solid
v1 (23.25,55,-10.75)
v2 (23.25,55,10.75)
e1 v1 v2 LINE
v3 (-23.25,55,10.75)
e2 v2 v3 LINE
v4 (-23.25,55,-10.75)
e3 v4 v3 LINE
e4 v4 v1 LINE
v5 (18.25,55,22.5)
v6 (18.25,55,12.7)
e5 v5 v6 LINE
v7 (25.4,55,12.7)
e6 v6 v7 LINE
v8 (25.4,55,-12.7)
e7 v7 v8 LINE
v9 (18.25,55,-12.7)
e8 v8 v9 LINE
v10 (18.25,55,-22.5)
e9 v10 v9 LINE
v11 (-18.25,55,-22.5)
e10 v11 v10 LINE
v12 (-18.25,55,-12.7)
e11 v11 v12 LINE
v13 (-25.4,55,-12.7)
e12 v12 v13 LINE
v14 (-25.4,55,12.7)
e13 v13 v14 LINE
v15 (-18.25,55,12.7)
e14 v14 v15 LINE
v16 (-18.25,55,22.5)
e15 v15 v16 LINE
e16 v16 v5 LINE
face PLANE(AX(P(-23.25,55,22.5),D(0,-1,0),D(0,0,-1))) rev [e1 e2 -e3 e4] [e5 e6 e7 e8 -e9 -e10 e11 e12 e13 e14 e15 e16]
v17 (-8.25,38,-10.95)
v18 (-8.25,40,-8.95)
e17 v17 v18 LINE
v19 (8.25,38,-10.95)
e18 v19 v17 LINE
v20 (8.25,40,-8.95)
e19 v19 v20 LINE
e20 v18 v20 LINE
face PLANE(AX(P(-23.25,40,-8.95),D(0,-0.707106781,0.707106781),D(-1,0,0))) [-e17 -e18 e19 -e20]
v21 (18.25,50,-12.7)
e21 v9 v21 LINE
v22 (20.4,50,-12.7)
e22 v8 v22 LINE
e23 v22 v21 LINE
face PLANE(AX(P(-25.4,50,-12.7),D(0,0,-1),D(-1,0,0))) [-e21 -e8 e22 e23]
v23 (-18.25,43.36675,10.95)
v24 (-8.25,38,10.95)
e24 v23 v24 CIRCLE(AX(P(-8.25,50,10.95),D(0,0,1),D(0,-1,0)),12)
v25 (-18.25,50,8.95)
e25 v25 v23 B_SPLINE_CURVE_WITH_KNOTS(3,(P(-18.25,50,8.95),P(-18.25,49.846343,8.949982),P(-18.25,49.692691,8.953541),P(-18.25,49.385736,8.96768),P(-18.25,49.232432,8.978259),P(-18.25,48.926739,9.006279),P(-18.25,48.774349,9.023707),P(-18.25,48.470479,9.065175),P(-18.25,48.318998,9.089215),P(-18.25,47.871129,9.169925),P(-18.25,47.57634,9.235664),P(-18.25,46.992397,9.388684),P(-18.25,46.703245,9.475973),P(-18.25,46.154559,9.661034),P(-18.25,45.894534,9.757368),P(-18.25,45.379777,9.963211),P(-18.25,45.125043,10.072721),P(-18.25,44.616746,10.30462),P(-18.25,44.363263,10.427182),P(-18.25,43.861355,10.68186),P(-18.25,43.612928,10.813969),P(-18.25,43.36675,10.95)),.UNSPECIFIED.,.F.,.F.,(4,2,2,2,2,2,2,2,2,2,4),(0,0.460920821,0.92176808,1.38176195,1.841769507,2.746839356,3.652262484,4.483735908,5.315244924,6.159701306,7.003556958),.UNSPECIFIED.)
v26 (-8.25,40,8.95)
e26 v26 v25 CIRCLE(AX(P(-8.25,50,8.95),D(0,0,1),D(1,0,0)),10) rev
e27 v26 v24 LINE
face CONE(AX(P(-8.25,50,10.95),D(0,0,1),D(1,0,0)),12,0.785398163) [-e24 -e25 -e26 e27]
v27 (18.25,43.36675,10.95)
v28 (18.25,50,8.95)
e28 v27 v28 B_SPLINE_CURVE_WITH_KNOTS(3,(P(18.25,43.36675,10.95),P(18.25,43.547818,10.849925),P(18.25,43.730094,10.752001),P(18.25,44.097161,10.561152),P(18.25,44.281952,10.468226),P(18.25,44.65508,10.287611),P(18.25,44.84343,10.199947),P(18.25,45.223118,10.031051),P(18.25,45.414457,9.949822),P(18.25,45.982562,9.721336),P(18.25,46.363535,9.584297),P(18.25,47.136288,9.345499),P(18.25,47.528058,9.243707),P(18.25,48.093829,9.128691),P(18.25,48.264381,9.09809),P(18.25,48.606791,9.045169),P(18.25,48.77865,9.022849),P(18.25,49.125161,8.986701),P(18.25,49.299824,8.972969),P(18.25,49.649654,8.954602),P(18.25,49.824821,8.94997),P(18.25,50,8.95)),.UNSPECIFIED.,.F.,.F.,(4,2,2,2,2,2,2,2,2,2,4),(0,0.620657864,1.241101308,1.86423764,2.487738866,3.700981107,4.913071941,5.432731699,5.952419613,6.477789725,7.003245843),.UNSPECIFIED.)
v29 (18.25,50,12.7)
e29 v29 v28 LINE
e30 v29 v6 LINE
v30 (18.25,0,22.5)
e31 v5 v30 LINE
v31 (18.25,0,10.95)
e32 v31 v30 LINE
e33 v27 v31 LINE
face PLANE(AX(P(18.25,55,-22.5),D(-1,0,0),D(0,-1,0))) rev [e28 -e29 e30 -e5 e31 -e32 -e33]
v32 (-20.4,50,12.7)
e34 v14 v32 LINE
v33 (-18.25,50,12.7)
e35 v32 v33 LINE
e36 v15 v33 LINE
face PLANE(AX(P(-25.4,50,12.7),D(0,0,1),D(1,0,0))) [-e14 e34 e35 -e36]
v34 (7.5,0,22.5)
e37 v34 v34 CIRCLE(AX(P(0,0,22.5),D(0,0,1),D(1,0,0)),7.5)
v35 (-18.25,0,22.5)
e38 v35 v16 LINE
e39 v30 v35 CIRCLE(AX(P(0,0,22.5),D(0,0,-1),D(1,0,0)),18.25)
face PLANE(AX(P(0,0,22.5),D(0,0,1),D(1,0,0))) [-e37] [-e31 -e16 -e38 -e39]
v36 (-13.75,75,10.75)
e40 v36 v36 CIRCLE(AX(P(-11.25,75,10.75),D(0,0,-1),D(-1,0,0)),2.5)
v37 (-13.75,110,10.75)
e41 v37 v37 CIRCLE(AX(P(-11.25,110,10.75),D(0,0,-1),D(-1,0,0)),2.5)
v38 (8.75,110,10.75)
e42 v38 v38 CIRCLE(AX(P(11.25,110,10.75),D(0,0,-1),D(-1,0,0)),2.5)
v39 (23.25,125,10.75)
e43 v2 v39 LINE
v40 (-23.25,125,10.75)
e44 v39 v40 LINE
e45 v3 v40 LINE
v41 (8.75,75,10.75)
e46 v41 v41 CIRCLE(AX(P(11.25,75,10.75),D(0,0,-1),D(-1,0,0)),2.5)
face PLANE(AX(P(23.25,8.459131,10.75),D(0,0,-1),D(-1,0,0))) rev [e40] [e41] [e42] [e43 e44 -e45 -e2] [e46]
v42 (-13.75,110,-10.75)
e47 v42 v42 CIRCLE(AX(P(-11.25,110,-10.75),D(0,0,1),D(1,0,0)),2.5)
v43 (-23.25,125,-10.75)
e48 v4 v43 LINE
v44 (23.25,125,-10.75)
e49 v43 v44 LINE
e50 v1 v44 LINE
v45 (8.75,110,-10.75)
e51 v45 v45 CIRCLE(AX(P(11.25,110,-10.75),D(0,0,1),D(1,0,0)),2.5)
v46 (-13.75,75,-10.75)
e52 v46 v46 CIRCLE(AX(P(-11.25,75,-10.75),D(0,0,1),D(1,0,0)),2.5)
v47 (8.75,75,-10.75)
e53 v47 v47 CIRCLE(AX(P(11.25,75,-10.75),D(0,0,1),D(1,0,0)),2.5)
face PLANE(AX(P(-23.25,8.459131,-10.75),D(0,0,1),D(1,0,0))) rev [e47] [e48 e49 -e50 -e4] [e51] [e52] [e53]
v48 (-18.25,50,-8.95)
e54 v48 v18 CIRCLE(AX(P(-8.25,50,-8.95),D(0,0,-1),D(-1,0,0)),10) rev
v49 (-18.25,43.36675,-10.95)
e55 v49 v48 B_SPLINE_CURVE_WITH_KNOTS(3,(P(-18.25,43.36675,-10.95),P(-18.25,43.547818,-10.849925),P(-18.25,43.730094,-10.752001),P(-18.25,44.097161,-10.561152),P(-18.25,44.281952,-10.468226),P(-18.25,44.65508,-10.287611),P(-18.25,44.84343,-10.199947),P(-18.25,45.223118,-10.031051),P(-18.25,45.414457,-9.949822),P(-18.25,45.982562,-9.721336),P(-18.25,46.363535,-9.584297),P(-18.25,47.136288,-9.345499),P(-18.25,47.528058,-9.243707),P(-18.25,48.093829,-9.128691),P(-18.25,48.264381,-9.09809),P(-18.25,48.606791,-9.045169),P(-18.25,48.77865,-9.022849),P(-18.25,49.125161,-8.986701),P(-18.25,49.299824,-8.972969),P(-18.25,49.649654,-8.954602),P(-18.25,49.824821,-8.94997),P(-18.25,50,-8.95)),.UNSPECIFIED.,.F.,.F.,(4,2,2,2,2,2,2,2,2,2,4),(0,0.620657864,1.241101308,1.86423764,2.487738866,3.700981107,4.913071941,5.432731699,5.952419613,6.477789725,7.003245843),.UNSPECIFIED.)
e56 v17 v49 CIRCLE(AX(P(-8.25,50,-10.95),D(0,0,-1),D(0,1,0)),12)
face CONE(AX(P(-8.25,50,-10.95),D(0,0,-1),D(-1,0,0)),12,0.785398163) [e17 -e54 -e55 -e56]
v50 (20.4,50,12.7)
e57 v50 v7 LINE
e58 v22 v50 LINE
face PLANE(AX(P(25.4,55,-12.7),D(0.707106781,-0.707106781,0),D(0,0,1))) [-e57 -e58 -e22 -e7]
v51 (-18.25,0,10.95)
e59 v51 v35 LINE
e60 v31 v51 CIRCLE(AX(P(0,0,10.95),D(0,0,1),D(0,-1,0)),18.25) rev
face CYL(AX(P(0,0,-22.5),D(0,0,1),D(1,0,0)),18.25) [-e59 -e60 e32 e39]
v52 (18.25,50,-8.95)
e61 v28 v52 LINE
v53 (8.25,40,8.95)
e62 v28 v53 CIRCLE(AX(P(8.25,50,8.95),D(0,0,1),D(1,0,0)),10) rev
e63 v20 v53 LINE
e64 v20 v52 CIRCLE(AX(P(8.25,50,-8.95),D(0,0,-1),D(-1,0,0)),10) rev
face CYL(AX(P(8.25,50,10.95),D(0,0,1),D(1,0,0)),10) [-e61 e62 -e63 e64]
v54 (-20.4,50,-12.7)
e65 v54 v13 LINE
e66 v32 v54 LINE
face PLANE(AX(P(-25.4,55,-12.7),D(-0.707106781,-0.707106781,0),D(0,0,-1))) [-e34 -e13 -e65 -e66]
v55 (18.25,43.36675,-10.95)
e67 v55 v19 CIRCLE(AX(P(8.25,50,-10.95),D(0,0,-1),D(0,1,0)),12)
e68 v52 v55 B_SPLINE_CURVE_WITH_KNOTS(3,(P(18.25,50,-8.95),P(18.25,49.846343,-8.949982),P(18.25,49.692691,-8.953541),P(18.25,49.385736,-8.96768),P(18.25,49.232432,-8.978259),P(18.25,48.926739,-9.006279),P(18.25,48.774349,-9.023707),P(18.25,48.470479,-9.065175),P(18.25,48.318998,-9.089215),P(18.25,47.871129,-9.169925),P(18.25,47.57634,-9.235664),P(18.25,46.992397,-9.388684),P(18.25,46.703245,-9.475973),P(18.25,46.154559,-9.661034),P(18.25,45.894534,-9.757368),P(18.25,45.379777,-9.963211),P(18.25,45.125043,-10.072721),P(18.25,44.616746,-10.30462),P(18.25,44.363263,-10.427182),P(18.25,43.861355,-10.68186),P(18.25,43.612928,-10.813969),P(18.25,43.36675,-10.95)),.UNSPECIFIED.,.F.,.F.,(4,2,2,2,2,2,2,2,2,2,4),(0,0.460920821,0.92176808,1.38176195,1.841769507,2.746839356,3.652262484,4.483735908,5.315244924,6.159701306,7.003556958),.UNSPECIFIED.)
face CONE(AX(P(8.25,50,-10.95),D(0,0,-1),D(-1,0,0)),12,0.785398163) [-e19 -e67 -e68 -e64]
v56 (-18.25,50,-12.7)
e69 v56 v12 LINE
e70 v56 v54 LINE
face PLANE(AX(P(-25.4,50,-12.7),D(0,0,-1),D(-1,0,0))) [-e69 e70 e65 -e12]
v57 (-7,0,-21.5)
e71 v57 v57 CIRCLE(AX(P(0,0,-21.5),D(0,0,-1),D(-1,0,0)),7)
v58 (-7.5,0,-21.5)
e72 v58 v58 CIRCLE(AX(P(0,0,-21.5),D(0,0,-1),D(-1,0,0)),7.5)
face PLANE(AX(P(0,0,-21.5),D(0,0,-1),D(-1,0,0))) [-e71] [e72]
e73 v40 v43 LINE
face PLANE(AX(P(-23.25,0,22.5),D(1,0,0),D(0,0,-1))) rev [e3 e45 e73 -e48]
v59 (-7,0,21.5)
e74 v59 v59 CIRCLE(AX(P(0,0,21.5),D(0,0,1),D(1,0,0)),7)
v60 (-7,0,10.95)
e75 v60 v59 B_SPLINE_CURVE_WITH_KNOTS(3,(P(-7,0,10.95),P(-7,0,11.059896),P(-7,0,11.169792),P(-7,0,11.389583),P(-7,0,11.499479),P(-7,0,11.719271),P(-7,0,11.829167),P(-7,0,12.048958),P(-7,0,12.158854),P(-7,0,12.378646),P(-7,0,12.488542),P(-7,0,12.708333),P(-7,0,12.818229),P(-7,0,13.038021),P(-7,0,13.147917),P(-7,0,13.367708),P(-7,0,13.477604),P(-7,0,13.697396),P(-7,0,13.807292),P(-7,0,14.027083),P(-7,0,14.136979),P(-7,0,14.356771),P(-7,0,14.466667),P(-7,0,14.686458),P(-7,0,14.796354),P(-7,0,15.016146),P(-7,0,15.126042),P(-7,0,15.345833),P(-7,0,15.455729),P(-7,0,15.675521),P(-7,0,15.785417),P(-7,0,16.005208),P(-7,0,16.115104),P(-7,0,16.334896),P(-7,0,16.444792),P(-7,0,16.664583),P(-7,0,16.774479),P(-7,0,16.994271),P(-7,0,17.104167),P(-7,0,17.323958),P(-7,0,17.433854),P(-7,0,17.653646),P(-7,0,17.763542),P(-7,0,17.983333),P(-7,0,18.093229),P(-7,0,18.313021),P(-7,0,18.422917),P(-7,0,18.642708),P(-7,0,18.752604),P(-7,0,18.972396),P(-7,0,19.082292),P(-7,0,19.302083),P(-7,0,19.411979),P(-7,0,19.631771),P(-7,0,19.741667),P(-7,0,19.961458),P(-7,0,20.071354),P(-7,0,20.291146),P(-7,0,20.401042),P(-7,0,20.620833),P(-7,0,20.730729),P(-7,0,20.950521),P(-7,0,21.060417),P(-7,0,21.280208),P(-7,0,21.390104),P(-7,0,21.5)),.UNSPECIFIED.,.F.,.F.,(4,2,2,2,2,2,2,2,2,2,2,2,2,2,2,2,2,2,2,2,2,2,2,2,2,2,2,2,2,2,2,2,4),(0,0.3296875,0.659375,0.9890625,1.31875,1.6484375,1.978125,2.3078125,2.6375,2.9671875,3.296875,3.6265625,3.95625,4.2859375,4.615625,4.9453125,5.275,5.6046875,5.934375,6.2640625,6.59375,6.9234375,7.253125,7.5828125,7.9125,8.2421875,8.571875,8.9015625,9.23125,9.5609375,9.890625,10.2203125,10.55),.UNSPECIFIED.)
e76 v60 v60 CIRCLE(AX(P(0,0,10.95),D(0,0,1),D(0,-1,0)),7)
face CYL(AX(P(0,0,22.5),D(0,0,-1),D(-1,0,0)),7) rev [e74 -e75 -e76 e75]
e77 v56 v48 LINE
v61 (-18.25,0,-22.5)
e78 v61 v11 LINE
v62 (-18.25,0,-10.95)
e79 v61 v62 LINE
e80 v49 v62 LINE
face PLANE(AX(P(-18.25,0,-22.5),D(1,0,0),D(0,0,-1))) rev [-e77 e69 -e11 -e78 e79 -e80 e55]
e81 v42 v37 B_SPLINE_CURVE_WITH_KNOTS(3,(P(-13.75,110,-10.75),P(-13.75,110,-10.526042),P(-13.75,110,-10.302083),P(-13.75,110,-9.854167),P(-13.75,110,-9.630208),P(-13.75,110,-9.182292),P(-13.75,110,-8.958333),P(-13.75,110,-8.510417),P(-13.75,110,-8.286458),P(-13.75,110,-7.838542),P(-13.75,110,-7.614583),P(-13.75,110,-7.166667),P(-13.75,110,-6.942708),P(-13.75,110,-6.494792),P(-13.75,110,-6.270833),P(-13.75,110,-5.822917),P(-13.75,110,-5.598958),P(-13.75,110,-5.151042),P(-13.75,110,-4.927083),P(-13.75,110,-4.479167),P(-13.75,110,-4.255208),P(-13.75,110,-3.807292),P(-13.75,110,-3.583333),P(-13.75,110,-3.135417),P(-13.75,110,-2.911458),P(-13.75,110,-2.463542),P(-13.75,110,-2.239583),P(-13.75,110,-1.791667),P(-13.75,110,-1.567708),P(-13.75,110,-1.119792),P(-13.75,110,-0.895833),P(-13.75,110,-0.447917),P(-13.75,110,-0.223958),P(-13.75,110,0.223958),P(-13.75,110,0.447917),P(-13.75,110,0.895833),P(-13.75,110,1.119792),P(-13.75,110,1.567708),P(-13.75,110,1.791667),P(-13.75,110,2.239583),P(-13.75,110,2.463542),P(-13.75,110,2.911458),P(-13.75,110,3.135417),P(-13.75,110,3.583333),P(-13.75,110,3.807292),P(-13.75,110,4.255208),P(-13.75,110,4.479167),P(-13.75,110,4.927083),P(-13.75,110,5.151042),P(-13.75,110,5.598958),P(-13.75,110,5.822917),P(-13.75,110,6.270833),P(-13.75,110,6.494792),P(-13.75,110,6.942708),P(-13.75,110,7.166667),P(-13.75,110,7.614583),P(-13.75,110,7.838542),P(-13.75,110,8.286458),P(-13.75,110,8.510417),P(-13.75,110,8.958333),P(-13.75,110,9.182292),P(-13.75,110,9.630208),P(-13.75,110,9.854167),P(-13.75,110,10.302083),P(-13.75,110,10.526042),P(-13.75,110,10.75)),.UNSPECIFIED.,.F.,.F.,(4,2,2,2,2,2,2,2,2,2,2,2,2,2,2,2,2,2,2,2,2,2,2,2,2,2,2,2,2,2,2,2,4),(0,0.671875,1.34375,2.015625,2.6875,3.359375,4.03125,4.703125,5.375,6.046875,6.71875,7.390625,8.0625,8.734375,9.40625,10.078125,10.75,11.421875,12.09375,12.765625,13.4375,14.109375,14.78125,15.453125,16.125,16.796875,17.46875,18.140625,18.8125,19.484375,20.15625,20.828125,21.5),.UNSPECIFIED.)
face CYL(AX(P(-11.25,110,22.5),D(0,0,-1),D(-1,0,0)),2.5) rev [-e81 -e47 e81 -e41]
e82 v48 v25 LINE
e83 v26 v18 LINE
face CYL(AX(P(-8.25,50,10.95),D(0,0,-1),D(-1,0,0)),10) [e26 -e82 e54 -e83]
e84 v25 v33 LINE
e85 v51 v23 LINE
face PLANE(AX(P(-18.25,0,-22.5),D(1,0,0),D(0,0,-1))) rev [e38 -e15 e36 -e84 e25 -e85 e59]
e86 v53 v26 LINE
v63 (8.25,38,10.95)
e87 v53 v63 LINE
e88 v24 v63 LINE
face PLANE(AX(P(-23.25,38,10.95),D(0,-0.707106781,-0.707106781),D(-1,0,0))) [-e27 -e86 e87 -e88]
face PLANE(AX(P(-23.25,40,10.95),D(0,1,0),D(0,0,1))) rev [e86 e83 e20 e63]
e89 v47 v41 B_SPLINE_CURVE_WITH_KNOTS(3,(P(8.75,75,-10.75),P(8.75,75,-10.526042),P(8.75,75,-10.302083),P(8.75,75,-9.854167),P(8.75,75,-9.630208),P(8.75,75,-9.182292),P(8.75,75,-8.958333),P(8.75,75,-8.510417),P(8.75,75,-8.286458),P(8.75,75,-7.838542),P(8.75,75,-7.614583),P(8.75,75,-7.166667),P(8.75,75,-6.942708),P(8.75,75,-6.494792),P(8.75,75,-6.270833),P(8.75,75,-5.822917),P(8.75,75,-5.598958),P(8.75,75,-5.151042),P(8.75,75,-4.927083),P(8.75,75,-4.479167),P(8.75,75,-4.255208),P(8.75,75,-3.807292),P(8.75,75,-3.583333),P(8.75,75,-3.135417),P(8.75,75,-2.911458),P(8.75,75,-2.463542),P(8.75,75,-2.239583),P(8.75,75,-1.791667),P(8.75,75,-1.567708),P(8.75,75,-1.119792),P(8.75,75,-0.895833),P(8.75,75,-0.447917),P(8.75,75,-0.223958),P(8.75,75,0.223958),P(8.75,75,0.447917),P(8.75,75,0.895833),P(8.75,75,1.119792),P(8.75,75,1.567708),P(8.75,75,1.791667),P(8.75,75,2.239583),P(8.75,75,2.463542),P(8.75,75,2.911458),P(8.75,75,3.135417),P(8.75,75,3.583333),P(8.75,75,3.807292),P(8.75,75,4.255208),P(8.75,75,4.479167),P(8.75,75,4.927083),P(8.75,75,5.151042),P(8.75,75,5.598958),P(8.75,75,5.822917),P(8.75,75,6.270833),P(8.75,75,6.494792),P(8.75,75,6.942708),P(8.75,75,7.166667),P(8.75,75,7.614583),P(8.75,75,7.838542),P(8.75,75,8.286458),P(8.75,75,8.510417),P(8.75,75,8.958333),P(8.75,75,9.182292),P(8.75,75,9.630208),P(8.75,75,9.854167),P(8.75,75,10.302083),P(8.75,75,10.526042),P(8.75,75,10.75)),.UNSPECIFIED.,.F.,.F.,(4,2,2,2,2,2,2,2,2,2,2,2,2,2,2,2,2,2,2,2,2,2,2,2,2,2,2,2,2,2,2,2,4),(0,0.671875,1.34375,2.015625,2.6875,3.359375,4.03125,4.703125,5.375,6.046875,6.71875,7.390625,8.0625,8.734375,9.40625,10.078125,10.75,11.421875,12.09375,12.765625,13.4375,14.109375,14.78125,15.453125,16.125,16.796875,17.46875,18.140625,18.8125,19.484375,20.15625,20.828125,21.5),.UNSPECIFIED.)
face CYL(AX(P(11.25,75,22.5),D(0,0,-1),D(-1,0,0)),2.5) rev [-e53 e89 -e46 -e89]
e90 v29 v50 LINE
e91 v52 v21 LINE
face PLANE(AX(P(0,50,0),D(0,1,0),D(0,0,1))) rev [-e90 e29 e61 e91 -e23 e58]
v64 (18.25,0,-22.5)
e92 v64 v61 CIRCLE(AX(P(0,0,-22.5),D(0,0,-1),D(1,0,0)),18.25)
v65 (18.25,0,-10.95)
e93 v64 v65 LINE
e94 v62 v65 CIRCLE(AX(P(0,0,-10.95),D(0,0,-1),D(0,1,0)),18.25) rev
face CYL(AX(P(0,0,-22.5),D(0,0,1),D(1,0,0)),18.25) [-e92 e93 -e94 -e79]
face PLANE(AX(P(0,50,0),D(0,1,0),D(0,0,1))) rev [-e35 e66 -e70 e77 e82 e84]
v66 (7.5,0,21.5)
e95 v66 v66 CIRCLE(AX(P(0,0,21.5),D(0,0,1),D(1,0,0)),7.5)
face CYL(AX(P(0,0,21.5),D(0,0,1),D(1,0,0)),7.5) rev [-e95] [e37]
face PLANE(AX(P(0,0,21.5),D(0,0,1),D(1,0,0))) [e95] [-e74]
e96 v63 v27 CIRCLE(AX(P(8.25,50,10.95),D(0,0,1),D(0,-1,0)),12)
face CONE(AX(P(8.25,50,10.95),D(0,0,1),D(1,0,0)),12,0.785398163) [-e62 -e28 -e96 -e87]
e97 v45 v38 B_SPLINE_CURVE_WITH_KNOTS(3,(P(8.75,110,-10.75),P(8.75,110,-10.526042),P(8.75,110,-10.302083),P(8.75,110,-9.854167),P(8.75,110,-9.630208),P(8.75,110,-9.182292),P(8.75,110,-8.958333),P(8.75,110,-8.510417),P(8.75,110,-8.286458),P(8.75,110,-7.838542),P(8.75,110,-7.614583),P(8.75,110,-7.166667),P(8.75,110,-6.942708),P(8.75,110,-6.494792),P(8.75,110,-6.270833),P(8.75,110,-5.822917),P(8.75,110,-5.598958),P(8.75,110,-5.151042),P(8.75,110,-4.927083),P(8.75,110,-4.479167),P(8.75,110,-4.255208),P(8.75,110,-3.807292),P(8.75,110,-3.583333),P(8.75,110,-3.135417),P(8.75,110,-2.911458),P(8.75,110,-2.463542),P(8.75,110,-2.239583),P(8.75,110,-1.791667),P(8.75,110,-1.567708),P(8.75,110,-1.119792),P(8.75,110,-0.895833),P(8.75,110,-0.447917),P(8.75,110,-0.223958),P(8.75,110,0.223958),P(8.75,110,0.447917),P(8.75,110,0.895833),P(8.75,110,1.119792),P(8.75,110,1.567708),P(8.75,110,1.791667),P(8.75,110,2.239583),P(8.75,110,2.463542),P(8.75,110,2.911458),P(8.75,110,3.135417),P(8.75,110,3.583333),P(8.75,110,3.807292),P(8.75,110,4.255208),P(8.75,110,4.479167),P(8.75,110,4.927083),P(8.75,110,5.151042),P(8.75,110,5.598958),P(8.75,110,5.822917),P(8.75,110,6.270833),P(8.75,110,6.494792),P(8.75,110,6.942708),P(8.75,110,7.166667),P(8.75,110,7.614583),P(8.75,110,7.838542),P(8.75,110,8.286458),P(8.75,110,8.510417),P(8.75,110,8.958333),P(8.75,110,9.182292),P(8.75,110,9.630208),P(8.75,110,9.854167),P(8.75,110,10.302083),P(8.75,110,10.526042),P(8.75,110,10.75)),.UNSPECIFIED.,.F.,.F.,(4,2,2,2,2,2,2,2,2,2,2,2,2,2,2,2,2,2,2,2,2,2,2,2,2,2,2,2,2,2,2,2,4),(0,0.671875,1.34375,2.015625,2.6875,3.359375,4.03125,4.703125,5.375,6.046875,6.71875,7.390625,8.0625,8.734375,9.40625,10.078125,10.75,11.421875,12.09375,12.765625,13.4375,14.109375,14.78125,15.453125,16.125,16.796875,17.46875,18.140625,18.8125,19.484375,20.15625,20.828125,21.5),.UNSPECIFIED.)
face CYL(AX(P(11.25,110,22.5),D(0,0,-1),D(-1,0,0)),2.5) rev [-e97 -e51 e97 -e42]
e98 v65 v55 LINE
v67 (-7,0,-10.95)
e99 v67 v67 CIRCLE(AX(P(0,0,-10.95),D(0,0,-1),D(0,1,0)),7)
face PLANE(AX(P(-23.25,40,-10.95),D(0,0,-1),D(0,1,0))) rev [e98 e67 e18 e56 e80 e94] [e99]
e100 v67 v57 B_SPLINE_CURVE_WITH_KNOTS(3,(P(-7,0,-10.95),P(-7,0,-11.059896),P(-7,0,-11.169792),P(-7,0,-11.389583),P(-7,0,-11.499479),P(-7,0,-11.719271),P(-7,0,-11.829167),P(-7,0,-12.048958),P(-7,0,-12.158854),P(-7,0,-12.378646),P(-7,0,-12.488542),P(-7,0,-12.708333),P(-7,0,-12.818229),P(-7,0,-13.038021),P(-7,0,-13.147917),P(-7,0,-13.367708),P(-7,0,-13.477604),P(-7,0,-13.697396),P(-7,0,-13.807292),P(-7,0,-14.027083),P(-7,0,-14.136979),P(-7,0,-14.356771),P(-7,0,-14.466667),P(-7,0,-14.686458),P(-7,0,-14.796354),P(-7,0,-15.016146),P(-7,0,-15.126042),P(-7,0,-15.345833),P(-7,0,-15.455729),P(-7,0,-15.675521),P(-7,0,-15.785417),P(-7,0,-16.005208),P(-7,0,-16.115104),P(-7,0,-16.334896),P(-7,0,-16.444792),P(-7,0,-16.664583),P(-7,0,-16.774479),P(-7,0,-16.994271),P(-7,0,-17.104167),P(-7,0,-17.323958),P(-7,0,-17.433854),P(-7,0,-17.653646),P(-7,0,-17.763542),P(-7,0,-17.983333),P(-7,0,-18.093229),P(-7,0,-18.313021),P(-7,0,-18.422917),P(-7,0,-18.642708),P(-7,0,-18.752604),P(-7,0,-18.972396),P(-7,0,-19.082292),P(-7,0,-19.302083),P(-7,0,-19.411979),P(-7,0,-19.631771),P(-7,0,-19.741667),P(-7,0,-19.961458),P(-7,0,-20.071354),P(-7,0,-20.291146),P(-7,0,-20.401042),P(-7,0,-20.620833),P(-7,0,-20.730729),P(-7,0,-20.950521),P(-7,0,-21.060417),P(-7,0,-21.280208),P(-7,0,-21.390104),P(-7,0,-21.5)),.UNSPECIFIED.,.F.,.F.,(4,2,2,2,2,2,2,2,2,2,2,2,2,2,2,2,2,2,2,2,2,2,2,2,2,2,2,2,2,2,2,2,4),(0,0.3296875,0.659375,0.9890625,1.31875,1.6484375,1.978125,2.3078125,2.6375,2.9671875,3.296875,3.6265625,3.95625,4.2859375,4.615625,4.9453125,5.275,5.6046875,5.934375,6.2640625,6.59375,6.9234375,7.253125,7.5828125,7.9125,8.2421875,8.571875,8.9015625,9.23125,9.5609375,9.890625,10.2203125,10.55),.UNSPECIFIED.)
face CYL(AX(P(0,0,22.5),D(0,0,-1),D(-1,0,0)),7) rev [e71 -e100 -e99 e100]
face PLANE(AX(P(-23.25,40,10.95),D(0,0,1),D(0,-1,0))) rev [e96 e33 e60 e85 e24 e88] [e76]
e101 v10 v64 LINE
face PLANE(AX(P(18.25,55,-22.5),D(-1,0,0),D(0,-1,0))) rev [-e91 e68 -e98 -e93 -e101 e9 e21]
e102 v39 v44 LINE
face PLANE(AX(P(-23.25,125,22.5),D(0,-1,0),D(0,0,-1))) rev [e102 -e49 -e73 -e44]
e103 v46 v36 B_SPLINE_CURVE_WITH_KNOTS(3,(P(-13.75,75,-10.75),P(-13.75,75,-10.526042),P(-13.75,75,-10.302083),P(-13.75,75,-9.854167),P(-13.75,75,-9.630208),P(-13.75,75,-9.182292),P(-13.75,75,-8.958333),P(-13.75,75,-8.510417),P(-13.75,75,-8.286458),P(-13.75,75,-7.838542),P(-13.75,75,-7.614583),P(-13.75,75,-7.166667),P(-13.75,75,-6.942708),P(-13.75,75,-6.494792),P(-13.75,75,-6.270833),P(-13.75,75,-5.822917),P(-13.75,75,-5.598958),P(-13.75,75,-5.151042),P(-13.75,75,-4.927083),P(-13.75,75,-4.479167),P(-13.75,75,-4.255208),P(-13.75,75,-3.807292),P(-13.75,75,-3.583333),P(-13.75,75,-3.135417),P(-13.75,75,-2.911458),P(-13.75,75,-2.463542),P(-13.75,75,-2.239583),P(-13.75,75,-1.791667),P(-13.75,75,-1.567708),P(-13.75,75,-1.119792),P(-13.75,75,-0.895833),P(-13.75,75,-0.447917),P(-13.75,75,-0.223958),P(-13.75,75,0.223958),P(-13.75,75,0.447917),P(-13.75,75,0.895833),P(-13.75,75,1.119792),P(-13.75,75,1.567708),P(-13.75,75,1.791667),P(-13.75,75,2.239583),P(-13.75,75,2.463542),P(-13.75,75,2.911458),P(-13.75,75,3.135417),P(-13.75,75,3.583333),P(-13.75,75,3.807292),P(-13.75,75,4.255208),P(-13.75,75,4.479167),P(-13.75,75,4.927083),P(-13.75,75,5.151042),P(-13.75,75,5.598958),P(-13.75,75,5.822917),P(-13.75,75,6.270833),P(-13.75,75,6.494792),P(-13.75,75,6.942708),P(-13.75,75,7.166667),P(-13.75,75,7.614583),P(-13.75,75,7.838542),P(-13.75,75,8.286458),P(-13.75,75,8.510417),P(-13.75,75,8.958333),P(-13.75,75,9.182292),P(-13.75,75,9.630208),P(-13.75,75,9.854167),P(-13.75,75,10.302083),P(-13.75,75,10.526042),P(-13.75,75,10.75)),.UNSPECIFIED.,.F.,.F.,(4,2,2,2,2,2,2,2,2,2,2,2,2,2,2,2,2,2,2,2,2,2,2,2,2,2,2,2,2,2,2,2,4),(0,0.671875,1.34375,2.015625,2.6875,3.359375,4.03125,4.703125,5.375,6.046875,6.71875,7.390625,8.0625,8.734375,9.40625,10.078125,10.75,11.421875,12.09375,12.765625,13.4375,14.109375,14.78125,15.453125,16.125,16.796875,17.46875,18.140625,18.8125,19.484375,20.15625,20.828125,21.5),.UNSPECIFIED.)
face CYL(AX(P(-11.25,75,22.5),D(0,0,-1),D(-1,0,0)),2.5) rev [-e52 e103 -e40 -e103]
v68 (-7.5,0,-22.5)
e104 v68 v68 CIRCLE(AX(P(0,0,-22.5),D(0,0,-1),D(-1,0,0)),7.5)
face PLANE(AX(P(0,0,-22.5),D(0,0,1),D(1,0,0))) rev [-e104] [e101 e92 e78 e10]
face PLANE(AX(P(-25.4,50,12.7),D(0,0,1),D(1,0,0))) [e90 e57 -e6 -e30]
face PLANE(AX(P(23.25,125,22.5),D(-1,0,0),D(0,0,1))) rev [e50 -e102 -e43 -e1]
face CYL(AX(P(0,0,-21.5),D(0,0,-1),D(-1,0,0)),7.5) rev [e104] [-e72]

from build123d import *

# Parameters (mm, degrees)
SKETCH1_R           = 7
SKETCH1_R_2         = 2.5
BOSS_EXTRUDE1_DEPTH = 22.5
SKETCH2_W           = 21.9
SKETCH2_H           = 63.25
CUT_EXTRUDE1_DEPTH  = 136.25346576
SKETCH3_R           = 7.5
CUT_EXTRUDE2_DEPTH  = 1
CUT_EXTRUDE3_START  = -1
SKETCH4_R           = 7.5
CUT_EXTRUDE3_DEPTH  = 1
SKETCH5_W           = 9.8
SKETCH5_H           = 70
CUT_EXTRUDE4_DEPTH  = 136.25346576
CUT_EXTRUDE5_DEPTH  = 135.872393395
CUT_EXTRUDE6_REACH  = 148.858
SKETCH8_W           = 46.5
SKETCH8_H           = 1.95
SKETCH9_W           = 50.8
SKETCH9_H           = 25.4
BOSS_EXTRUDE2_DEPTH = 5
FILLET1_R           = 10
CHAMFER1_SIZE       = 5
CHAMFER2_SIZE       = 2


# Some blends are built 0.0001 mm under size
with BuildPart() as part:
    # Sketch1 → Boss-Extrude1 (new, symmetric)
    with BuildSketch(Plane.XY):
        with BuildLine():
            Line((-23.25, 0), (-23.25, 125))
            Line((-23.25, 125), (23.25, 125))
            Line((23.25, 125), (23.25, 0))
            ThreePointArc((23.25, 0), (0, -23.25), (-23.25, 0))
        make_face()
        with Locations(Location((0, 0, 0), (0, 0, 180))):
            Circle(SKETCH1_R, mode=Mode.SUBTRACT)
        with Locations(Location((-11.25, 110, 0), (0, 0, 180))):
            Circle(SKETCH1_R_2, mode=Mode.SUBTRACT)
        with Locations(Location((11.25, 110, 0), (0, 0, 180))):
            Circle(SKETCH1_R_2, mode=Mode.SUBTRACT)
        with Locations(Location((11.25, 75, 0), (0, 0, 180))):
            Circle(SKETCH1_R_2, mode=Mode.SUBTRACT)
        with Locations(Location((-11.25, 75, 0), (0, 0, 180))):
            Circle(SKETCH1_R_2, mode=Mode.SUBTRACT)
    extrude(amount=BOSS_EXTRUDE1_DEPTH, both=True)

    # Sketch2 → Cut-Extrude1 (cut, through all)
    with BuildSketch(Plane(origin=(23.25, 0, 0), x_dir=(0, 0, -1), z_dir=(1, 0, 0))):
        with Locations((0, 8.375)):
            Rectangle(SKETCH2_W, SKETCH2_H)
    extrude(amount=-CUT_EXTRUDE1_DEPTH, mode=Mode.SUBTRACT)

    # Sketch3 → Cut-Extrude2 (cut)
    with BuildSketch(Plane.XY.offset(22.5)):
        Circle(SKETCH3_R)
    extrude(amount=-CUT_EXTRUDE2_DEPTH, mode=Mode.SUBTRACT)

    # Sketch4 → Cut-Extrude3 (cut)
    with BuildSketch(Plane(origin=(0, 0, -22.5), x_dir=(-1, 0, 0), z_dir=(0, 0, -1)).offset(CUT_EXTRUDE3_START)):
        with Locations(Location((0, 0, 0), (0, 0, 180))):
            Circle(SKETCH4_R)
    extrude(amount=CUT_EXTRUDE3_DEPTH, mode=Mode.SUBTRACT)

    # Sketch5 → Cut-Extrude4 (cut, through all)
    with BuildSketch(Plane(origin=(23.25, 0, 0), x_dir=(0, 0, -1), z_dir=(1, 0, 0))):
        with Locations((-17.6, 90)):
            Rectangle(SKETCH5_W, SKETCH5_H)
        with Locations((17.6, 90)):
            Rectangle(SKETCH5_W, SKETCH5_H)
    extrude(amount=-CUT_EXTRUDE4_DEPTH, mode=Mode.SUBTRACT)

    # Sketch6 → Cut-Extrude5 (cut, through all)
    with BuildSketch(Plane.XY.offset(22.5)):
        with BuildLine():
            Line((-18.25, 0), (-18.25, 55))
            Line((-18.25, 55), (-23.25, 55))
            Line((-23.25, 55), (-23.25, -23.25))
            Line((-23.25, -23.25), (23.25, -23.25))
            Line((23.25, -23.25), (23.25, 55))
            Line((23.25, 55), (18.25, 55))
            Line((18.25, 55), (18.25, 0))
            ThreePointArc((18.25, 0), (0, -18.25), (-18.25, 0))
        make_face()
    extrude(amount=-CUT_EXTRUDE5_DEPTH, mode=Mode.SUBTRACT)

    # Cut-Extrude6: up to this face of the body (flat: up to its plane)
    cut_extrude6_end = Plane(part.part.faces().sort_by_distance((0, 55, -17.6))[0])
    # Sketch8 → Cut-Extrude6 (cut, up to the picked face)
    with BuildSketch(Plane(origin=(0, 125, 0), x_dir=(1, 0, 0), z_dir=(0, 1, 0)), mode=Mode.PRIVATE) as cut_extrude6_sk1:
        with Locations((0, 11.725)):
            Rectangle(SKETCH8_W, SKETCH8_H)
    cut_extrude6_tool1 = split(extrude(cut_extrude6_sk1.sketch, amount=-CUT_EXTRUDE6_REACH, mode=Mode.PRIVATE), bisect_by=cut_extrude6_end, keep=Keep.BOTH, mode=Mode.PRIVATE)
    # Sketch8 → Cut-Extrude6 (cut, up to the picked face)
    with BuildSketch(Plane(origin=(0, 125, 0), x_dir=(1, 0, 0), z_dir=(0, 1, 0)), mode=Mode.PRIVATE) as cut_extrude6_sk2:
        with Locations((0, -11.725)):
            Rectangle(SKETCH8_W, SKETCH8_H)
    cut_extrude6_tool2 = split(extrude(cut_extrude6_sk2.sketch, amount=-CUT_EXTRUDE6_REACH, mode=Mode.PRIVATE), bisect_by=cut_extrude6_end, keep=Keep.BOTH, mode=Mode.PRIVATE)
    add(cut_extrude6_tool1.solids().sort_by(Axis((0, 125, -11.725), (0, -1, 0)))[0], mode=Mode.SUBTRACT)
    add(cut_extrude6_tool2.solids().sort_by(Axis((0, 125, 11.725), (0, -1, 0)))[0], mode=Mode.SUBTRACT)

    # Sketch9 → Boss-Extrude2 (add)
    with BuildSketch(Plane(origin=(0, 55, 0), x_dir=(1, 0, 0), z_dir=(0, 1, 0))):
        Rectangle(SKETCH9_W, SKETCH9_H)
    extrude(amount=-BOSS_EXTRUDE2_DEPTH)

    # Fillet1
    fillet1_edges = [part.edges().sort_by_distance(p)[0] for p in [
        (18.25, 40, 0),
        (-18.25, 40, 0),
    ]]
    fillet(fillet1_edges, radius=FILLET1_R - 0.0001)  # a hair under: the kernel refuses the full size

    # Chamfer1
    chamfer1_edges = [part.edges().sort_by_distance(p)[0] for p in [
        (-25.4, 50, 0),
        (25.4, 50, 0),
    ]]
    chamfer(chamfer1_edges, length=CHAMFER1_SIZE - 0.0001)  # a hair under: the kernel refuses the full size

    # Chamfer2
    # the kernel refuses this chamfer: 2 mm, written as the material it adds along each edge
    with BuildSketch(Plane(origin=(8.2501, 40, -10.95), x_dir=(0, -0.9996219169112968, -0.02749587661058651), z_dir=(-1, 0, 0))) as chamfer2_piece_1:
        Polygon((CHAMFER2_SIZE * 0.999621916911, CHAMFER2_SIZE * 0.0274958766106), (-CHAMFER2_SIZE * 0.0274958766106, CHAMFER2_SIZE * 0.999621916911), (0, 0), align=None)
    extrude(amount=16.5002)
    with BuildSketch(Plane(origin=(8.2501, 40, 10.95), x_dir=(0, -0.9996219169112968, 0.02749587661058651), z_dir=(-1, 0, 0))) as chamfer2_piece_2:
        Polygon((CHAMFER2_SIZE * 0.999621916911, -CHAMFER2_SIZE * 0.0274958766106), (-CHAMFER2_SIZE * 0.0274958766106, -CHAMFER2_SIZE * 0.999621916911), (0, 0), align=None)
    extrude(amount=16.5002)
    with BuildSketch(Plane(origin=(8.2501, 49.9999, 10.95), x_dir=(0, -1, 0), z_dir=(-1, 0, 0))) as chamfer2_piece_3_section:
        Polygon((9.9999 + CHAMFER2_SIZE, 0), (9.9999, -CHAMFER2_SIZE), (9.9999, 0), align=None)
    chamfer2_piece_3 = revolve(axis=Axis((8.2501, 49.9999, 10.95), (0, 0, 1)), revolution_arc=119.48144917, mode=Mode.PRIVATE)
    chamfer2_piece_3 = split(chamfer2_piece_3, bisect_by=Plane(origin=(18.25, 39.233435125, 10.852733076), z_dir=(-1, 0, 0)), keep=Keep.TOP, mode=Mode.PRIVATE)
    chamfer2_piece_3 = split(chamfer2_piece_3, bisect_by=Plane(origin=(10.698789492, 50, 10.852733076), z_dir=(0, -1, 0)), keep=Keep.TOP, mode=Mode.PRIVATE)
    add(chamfer2_piece_3)
    with BuildSketch(Plane(origin=(8.2501, 49.9999, -10.95), x_dir=(0, -1, 0), z_dir=(-1, 0, 0))) as chamfer2_piece_4_section:
        Polygon((9.9999 + CHAMFER2_SIZE, 0), (9.9999, CHAMFER2_SIZE), (9.9999, 0), align=None)
    chamfer2_piece_4 = revolve(axis=Axis((8.2501, 49.9999, -10.95), (0, 0, 1)), revolution_arc=119.48144917, mode=Mode.PRIVATE)
    chamfer2_piece_4 = split(chamfer2_piece_4, bisect_by=Plane(origin=(18.25, 39.233435125, -10.852733076), z_dir=(-1, 0, 0)), keep=Keep.TOP, mode=Mode.PRIVATE)
    chamfer2_piece_4 = split(chamfer2_piece_4, bisect_by=Plane(origin=(10.698789492, 50, -10.852733076), z_dir=(0, -1, 0)), keep=Keep.TOP, mode=Mode.PRIVATE)
    add(chamfer2_piece_4)
    with BuildSketch(Plane(origin=(-8.2501, 49.9999, -10.95), x_dir=(0, -1, 0), z_dir=(1, 0, 0))) as chamfer2_piece_5_section:
        Polygon((9.9999 + CHAMFER2_SIZE, 0), (9.9999, -CHAMFER2_SIZE), (9.9999, 0), align=None)
    chamfer2_piece_5 = revolve(axis=Axis((-8.2501, 49.9999, -10.95), (0, 0, -1)), revolution_arc=119.48144917, mode=Mode.PRIVATE)
    chamfer2_piece_5 = split(chamfer2_piece_5, bisect_by=Plane(origin=(-10.698789492, 50, -10.852733076), z_dir=(0, -1, 0)), keep=Keep.TOP, mode=Mode.PRIVATE)
    chamfer2_piece_5 = split(chamfer2_piece_5, bisect_by=Plane(origin=(-18.25, 39.233435125, -10.852733076), z_dir=(1, 0, 0)), keep=Keep.TOP, mode=Mode.PRIVATE)
    add(chamfer2_piece_5)
    with BuildSketch(Plane(origin=(-8.2501, 49.9999, 10.95), x_dir=(0, -1, 0), z_dir=(1, 0, 0))) as chamfer2_piece_6_section:
        Polygon((9.9999 + CHAMFER2_SIZE, 0), (9.9999, CHAMFER2_SIZE), (9.9999, 0), align=None)
    chamfer2_piece_6 = revolve(axis=Axis((-8.2501, 49.9999, 10.95), (0, 0, -1)), revolution_arc=119.48144917, mode=Mode.PRIVATE)
    chamfer2_piece_6 = split(chamfer2_piece_6, bisect_by=Plane(origin=(-10.698789492, 50, 10.852733076), z_dir=(0, -1, 0)), keep=Keep.TOP, mode=Mode.PRIVATE)
    chamfer2_piece_6 = split(chamfer2_piece_6, bisect_by=Plane(origin=(-18.25, 39.233435125, 10.852733076), z_dir=(1, 0, 0)), keep=Keep.TOP, mode=Mode.PRIVATE)
    add(chamfer2_piece_6)


solid = part.part
